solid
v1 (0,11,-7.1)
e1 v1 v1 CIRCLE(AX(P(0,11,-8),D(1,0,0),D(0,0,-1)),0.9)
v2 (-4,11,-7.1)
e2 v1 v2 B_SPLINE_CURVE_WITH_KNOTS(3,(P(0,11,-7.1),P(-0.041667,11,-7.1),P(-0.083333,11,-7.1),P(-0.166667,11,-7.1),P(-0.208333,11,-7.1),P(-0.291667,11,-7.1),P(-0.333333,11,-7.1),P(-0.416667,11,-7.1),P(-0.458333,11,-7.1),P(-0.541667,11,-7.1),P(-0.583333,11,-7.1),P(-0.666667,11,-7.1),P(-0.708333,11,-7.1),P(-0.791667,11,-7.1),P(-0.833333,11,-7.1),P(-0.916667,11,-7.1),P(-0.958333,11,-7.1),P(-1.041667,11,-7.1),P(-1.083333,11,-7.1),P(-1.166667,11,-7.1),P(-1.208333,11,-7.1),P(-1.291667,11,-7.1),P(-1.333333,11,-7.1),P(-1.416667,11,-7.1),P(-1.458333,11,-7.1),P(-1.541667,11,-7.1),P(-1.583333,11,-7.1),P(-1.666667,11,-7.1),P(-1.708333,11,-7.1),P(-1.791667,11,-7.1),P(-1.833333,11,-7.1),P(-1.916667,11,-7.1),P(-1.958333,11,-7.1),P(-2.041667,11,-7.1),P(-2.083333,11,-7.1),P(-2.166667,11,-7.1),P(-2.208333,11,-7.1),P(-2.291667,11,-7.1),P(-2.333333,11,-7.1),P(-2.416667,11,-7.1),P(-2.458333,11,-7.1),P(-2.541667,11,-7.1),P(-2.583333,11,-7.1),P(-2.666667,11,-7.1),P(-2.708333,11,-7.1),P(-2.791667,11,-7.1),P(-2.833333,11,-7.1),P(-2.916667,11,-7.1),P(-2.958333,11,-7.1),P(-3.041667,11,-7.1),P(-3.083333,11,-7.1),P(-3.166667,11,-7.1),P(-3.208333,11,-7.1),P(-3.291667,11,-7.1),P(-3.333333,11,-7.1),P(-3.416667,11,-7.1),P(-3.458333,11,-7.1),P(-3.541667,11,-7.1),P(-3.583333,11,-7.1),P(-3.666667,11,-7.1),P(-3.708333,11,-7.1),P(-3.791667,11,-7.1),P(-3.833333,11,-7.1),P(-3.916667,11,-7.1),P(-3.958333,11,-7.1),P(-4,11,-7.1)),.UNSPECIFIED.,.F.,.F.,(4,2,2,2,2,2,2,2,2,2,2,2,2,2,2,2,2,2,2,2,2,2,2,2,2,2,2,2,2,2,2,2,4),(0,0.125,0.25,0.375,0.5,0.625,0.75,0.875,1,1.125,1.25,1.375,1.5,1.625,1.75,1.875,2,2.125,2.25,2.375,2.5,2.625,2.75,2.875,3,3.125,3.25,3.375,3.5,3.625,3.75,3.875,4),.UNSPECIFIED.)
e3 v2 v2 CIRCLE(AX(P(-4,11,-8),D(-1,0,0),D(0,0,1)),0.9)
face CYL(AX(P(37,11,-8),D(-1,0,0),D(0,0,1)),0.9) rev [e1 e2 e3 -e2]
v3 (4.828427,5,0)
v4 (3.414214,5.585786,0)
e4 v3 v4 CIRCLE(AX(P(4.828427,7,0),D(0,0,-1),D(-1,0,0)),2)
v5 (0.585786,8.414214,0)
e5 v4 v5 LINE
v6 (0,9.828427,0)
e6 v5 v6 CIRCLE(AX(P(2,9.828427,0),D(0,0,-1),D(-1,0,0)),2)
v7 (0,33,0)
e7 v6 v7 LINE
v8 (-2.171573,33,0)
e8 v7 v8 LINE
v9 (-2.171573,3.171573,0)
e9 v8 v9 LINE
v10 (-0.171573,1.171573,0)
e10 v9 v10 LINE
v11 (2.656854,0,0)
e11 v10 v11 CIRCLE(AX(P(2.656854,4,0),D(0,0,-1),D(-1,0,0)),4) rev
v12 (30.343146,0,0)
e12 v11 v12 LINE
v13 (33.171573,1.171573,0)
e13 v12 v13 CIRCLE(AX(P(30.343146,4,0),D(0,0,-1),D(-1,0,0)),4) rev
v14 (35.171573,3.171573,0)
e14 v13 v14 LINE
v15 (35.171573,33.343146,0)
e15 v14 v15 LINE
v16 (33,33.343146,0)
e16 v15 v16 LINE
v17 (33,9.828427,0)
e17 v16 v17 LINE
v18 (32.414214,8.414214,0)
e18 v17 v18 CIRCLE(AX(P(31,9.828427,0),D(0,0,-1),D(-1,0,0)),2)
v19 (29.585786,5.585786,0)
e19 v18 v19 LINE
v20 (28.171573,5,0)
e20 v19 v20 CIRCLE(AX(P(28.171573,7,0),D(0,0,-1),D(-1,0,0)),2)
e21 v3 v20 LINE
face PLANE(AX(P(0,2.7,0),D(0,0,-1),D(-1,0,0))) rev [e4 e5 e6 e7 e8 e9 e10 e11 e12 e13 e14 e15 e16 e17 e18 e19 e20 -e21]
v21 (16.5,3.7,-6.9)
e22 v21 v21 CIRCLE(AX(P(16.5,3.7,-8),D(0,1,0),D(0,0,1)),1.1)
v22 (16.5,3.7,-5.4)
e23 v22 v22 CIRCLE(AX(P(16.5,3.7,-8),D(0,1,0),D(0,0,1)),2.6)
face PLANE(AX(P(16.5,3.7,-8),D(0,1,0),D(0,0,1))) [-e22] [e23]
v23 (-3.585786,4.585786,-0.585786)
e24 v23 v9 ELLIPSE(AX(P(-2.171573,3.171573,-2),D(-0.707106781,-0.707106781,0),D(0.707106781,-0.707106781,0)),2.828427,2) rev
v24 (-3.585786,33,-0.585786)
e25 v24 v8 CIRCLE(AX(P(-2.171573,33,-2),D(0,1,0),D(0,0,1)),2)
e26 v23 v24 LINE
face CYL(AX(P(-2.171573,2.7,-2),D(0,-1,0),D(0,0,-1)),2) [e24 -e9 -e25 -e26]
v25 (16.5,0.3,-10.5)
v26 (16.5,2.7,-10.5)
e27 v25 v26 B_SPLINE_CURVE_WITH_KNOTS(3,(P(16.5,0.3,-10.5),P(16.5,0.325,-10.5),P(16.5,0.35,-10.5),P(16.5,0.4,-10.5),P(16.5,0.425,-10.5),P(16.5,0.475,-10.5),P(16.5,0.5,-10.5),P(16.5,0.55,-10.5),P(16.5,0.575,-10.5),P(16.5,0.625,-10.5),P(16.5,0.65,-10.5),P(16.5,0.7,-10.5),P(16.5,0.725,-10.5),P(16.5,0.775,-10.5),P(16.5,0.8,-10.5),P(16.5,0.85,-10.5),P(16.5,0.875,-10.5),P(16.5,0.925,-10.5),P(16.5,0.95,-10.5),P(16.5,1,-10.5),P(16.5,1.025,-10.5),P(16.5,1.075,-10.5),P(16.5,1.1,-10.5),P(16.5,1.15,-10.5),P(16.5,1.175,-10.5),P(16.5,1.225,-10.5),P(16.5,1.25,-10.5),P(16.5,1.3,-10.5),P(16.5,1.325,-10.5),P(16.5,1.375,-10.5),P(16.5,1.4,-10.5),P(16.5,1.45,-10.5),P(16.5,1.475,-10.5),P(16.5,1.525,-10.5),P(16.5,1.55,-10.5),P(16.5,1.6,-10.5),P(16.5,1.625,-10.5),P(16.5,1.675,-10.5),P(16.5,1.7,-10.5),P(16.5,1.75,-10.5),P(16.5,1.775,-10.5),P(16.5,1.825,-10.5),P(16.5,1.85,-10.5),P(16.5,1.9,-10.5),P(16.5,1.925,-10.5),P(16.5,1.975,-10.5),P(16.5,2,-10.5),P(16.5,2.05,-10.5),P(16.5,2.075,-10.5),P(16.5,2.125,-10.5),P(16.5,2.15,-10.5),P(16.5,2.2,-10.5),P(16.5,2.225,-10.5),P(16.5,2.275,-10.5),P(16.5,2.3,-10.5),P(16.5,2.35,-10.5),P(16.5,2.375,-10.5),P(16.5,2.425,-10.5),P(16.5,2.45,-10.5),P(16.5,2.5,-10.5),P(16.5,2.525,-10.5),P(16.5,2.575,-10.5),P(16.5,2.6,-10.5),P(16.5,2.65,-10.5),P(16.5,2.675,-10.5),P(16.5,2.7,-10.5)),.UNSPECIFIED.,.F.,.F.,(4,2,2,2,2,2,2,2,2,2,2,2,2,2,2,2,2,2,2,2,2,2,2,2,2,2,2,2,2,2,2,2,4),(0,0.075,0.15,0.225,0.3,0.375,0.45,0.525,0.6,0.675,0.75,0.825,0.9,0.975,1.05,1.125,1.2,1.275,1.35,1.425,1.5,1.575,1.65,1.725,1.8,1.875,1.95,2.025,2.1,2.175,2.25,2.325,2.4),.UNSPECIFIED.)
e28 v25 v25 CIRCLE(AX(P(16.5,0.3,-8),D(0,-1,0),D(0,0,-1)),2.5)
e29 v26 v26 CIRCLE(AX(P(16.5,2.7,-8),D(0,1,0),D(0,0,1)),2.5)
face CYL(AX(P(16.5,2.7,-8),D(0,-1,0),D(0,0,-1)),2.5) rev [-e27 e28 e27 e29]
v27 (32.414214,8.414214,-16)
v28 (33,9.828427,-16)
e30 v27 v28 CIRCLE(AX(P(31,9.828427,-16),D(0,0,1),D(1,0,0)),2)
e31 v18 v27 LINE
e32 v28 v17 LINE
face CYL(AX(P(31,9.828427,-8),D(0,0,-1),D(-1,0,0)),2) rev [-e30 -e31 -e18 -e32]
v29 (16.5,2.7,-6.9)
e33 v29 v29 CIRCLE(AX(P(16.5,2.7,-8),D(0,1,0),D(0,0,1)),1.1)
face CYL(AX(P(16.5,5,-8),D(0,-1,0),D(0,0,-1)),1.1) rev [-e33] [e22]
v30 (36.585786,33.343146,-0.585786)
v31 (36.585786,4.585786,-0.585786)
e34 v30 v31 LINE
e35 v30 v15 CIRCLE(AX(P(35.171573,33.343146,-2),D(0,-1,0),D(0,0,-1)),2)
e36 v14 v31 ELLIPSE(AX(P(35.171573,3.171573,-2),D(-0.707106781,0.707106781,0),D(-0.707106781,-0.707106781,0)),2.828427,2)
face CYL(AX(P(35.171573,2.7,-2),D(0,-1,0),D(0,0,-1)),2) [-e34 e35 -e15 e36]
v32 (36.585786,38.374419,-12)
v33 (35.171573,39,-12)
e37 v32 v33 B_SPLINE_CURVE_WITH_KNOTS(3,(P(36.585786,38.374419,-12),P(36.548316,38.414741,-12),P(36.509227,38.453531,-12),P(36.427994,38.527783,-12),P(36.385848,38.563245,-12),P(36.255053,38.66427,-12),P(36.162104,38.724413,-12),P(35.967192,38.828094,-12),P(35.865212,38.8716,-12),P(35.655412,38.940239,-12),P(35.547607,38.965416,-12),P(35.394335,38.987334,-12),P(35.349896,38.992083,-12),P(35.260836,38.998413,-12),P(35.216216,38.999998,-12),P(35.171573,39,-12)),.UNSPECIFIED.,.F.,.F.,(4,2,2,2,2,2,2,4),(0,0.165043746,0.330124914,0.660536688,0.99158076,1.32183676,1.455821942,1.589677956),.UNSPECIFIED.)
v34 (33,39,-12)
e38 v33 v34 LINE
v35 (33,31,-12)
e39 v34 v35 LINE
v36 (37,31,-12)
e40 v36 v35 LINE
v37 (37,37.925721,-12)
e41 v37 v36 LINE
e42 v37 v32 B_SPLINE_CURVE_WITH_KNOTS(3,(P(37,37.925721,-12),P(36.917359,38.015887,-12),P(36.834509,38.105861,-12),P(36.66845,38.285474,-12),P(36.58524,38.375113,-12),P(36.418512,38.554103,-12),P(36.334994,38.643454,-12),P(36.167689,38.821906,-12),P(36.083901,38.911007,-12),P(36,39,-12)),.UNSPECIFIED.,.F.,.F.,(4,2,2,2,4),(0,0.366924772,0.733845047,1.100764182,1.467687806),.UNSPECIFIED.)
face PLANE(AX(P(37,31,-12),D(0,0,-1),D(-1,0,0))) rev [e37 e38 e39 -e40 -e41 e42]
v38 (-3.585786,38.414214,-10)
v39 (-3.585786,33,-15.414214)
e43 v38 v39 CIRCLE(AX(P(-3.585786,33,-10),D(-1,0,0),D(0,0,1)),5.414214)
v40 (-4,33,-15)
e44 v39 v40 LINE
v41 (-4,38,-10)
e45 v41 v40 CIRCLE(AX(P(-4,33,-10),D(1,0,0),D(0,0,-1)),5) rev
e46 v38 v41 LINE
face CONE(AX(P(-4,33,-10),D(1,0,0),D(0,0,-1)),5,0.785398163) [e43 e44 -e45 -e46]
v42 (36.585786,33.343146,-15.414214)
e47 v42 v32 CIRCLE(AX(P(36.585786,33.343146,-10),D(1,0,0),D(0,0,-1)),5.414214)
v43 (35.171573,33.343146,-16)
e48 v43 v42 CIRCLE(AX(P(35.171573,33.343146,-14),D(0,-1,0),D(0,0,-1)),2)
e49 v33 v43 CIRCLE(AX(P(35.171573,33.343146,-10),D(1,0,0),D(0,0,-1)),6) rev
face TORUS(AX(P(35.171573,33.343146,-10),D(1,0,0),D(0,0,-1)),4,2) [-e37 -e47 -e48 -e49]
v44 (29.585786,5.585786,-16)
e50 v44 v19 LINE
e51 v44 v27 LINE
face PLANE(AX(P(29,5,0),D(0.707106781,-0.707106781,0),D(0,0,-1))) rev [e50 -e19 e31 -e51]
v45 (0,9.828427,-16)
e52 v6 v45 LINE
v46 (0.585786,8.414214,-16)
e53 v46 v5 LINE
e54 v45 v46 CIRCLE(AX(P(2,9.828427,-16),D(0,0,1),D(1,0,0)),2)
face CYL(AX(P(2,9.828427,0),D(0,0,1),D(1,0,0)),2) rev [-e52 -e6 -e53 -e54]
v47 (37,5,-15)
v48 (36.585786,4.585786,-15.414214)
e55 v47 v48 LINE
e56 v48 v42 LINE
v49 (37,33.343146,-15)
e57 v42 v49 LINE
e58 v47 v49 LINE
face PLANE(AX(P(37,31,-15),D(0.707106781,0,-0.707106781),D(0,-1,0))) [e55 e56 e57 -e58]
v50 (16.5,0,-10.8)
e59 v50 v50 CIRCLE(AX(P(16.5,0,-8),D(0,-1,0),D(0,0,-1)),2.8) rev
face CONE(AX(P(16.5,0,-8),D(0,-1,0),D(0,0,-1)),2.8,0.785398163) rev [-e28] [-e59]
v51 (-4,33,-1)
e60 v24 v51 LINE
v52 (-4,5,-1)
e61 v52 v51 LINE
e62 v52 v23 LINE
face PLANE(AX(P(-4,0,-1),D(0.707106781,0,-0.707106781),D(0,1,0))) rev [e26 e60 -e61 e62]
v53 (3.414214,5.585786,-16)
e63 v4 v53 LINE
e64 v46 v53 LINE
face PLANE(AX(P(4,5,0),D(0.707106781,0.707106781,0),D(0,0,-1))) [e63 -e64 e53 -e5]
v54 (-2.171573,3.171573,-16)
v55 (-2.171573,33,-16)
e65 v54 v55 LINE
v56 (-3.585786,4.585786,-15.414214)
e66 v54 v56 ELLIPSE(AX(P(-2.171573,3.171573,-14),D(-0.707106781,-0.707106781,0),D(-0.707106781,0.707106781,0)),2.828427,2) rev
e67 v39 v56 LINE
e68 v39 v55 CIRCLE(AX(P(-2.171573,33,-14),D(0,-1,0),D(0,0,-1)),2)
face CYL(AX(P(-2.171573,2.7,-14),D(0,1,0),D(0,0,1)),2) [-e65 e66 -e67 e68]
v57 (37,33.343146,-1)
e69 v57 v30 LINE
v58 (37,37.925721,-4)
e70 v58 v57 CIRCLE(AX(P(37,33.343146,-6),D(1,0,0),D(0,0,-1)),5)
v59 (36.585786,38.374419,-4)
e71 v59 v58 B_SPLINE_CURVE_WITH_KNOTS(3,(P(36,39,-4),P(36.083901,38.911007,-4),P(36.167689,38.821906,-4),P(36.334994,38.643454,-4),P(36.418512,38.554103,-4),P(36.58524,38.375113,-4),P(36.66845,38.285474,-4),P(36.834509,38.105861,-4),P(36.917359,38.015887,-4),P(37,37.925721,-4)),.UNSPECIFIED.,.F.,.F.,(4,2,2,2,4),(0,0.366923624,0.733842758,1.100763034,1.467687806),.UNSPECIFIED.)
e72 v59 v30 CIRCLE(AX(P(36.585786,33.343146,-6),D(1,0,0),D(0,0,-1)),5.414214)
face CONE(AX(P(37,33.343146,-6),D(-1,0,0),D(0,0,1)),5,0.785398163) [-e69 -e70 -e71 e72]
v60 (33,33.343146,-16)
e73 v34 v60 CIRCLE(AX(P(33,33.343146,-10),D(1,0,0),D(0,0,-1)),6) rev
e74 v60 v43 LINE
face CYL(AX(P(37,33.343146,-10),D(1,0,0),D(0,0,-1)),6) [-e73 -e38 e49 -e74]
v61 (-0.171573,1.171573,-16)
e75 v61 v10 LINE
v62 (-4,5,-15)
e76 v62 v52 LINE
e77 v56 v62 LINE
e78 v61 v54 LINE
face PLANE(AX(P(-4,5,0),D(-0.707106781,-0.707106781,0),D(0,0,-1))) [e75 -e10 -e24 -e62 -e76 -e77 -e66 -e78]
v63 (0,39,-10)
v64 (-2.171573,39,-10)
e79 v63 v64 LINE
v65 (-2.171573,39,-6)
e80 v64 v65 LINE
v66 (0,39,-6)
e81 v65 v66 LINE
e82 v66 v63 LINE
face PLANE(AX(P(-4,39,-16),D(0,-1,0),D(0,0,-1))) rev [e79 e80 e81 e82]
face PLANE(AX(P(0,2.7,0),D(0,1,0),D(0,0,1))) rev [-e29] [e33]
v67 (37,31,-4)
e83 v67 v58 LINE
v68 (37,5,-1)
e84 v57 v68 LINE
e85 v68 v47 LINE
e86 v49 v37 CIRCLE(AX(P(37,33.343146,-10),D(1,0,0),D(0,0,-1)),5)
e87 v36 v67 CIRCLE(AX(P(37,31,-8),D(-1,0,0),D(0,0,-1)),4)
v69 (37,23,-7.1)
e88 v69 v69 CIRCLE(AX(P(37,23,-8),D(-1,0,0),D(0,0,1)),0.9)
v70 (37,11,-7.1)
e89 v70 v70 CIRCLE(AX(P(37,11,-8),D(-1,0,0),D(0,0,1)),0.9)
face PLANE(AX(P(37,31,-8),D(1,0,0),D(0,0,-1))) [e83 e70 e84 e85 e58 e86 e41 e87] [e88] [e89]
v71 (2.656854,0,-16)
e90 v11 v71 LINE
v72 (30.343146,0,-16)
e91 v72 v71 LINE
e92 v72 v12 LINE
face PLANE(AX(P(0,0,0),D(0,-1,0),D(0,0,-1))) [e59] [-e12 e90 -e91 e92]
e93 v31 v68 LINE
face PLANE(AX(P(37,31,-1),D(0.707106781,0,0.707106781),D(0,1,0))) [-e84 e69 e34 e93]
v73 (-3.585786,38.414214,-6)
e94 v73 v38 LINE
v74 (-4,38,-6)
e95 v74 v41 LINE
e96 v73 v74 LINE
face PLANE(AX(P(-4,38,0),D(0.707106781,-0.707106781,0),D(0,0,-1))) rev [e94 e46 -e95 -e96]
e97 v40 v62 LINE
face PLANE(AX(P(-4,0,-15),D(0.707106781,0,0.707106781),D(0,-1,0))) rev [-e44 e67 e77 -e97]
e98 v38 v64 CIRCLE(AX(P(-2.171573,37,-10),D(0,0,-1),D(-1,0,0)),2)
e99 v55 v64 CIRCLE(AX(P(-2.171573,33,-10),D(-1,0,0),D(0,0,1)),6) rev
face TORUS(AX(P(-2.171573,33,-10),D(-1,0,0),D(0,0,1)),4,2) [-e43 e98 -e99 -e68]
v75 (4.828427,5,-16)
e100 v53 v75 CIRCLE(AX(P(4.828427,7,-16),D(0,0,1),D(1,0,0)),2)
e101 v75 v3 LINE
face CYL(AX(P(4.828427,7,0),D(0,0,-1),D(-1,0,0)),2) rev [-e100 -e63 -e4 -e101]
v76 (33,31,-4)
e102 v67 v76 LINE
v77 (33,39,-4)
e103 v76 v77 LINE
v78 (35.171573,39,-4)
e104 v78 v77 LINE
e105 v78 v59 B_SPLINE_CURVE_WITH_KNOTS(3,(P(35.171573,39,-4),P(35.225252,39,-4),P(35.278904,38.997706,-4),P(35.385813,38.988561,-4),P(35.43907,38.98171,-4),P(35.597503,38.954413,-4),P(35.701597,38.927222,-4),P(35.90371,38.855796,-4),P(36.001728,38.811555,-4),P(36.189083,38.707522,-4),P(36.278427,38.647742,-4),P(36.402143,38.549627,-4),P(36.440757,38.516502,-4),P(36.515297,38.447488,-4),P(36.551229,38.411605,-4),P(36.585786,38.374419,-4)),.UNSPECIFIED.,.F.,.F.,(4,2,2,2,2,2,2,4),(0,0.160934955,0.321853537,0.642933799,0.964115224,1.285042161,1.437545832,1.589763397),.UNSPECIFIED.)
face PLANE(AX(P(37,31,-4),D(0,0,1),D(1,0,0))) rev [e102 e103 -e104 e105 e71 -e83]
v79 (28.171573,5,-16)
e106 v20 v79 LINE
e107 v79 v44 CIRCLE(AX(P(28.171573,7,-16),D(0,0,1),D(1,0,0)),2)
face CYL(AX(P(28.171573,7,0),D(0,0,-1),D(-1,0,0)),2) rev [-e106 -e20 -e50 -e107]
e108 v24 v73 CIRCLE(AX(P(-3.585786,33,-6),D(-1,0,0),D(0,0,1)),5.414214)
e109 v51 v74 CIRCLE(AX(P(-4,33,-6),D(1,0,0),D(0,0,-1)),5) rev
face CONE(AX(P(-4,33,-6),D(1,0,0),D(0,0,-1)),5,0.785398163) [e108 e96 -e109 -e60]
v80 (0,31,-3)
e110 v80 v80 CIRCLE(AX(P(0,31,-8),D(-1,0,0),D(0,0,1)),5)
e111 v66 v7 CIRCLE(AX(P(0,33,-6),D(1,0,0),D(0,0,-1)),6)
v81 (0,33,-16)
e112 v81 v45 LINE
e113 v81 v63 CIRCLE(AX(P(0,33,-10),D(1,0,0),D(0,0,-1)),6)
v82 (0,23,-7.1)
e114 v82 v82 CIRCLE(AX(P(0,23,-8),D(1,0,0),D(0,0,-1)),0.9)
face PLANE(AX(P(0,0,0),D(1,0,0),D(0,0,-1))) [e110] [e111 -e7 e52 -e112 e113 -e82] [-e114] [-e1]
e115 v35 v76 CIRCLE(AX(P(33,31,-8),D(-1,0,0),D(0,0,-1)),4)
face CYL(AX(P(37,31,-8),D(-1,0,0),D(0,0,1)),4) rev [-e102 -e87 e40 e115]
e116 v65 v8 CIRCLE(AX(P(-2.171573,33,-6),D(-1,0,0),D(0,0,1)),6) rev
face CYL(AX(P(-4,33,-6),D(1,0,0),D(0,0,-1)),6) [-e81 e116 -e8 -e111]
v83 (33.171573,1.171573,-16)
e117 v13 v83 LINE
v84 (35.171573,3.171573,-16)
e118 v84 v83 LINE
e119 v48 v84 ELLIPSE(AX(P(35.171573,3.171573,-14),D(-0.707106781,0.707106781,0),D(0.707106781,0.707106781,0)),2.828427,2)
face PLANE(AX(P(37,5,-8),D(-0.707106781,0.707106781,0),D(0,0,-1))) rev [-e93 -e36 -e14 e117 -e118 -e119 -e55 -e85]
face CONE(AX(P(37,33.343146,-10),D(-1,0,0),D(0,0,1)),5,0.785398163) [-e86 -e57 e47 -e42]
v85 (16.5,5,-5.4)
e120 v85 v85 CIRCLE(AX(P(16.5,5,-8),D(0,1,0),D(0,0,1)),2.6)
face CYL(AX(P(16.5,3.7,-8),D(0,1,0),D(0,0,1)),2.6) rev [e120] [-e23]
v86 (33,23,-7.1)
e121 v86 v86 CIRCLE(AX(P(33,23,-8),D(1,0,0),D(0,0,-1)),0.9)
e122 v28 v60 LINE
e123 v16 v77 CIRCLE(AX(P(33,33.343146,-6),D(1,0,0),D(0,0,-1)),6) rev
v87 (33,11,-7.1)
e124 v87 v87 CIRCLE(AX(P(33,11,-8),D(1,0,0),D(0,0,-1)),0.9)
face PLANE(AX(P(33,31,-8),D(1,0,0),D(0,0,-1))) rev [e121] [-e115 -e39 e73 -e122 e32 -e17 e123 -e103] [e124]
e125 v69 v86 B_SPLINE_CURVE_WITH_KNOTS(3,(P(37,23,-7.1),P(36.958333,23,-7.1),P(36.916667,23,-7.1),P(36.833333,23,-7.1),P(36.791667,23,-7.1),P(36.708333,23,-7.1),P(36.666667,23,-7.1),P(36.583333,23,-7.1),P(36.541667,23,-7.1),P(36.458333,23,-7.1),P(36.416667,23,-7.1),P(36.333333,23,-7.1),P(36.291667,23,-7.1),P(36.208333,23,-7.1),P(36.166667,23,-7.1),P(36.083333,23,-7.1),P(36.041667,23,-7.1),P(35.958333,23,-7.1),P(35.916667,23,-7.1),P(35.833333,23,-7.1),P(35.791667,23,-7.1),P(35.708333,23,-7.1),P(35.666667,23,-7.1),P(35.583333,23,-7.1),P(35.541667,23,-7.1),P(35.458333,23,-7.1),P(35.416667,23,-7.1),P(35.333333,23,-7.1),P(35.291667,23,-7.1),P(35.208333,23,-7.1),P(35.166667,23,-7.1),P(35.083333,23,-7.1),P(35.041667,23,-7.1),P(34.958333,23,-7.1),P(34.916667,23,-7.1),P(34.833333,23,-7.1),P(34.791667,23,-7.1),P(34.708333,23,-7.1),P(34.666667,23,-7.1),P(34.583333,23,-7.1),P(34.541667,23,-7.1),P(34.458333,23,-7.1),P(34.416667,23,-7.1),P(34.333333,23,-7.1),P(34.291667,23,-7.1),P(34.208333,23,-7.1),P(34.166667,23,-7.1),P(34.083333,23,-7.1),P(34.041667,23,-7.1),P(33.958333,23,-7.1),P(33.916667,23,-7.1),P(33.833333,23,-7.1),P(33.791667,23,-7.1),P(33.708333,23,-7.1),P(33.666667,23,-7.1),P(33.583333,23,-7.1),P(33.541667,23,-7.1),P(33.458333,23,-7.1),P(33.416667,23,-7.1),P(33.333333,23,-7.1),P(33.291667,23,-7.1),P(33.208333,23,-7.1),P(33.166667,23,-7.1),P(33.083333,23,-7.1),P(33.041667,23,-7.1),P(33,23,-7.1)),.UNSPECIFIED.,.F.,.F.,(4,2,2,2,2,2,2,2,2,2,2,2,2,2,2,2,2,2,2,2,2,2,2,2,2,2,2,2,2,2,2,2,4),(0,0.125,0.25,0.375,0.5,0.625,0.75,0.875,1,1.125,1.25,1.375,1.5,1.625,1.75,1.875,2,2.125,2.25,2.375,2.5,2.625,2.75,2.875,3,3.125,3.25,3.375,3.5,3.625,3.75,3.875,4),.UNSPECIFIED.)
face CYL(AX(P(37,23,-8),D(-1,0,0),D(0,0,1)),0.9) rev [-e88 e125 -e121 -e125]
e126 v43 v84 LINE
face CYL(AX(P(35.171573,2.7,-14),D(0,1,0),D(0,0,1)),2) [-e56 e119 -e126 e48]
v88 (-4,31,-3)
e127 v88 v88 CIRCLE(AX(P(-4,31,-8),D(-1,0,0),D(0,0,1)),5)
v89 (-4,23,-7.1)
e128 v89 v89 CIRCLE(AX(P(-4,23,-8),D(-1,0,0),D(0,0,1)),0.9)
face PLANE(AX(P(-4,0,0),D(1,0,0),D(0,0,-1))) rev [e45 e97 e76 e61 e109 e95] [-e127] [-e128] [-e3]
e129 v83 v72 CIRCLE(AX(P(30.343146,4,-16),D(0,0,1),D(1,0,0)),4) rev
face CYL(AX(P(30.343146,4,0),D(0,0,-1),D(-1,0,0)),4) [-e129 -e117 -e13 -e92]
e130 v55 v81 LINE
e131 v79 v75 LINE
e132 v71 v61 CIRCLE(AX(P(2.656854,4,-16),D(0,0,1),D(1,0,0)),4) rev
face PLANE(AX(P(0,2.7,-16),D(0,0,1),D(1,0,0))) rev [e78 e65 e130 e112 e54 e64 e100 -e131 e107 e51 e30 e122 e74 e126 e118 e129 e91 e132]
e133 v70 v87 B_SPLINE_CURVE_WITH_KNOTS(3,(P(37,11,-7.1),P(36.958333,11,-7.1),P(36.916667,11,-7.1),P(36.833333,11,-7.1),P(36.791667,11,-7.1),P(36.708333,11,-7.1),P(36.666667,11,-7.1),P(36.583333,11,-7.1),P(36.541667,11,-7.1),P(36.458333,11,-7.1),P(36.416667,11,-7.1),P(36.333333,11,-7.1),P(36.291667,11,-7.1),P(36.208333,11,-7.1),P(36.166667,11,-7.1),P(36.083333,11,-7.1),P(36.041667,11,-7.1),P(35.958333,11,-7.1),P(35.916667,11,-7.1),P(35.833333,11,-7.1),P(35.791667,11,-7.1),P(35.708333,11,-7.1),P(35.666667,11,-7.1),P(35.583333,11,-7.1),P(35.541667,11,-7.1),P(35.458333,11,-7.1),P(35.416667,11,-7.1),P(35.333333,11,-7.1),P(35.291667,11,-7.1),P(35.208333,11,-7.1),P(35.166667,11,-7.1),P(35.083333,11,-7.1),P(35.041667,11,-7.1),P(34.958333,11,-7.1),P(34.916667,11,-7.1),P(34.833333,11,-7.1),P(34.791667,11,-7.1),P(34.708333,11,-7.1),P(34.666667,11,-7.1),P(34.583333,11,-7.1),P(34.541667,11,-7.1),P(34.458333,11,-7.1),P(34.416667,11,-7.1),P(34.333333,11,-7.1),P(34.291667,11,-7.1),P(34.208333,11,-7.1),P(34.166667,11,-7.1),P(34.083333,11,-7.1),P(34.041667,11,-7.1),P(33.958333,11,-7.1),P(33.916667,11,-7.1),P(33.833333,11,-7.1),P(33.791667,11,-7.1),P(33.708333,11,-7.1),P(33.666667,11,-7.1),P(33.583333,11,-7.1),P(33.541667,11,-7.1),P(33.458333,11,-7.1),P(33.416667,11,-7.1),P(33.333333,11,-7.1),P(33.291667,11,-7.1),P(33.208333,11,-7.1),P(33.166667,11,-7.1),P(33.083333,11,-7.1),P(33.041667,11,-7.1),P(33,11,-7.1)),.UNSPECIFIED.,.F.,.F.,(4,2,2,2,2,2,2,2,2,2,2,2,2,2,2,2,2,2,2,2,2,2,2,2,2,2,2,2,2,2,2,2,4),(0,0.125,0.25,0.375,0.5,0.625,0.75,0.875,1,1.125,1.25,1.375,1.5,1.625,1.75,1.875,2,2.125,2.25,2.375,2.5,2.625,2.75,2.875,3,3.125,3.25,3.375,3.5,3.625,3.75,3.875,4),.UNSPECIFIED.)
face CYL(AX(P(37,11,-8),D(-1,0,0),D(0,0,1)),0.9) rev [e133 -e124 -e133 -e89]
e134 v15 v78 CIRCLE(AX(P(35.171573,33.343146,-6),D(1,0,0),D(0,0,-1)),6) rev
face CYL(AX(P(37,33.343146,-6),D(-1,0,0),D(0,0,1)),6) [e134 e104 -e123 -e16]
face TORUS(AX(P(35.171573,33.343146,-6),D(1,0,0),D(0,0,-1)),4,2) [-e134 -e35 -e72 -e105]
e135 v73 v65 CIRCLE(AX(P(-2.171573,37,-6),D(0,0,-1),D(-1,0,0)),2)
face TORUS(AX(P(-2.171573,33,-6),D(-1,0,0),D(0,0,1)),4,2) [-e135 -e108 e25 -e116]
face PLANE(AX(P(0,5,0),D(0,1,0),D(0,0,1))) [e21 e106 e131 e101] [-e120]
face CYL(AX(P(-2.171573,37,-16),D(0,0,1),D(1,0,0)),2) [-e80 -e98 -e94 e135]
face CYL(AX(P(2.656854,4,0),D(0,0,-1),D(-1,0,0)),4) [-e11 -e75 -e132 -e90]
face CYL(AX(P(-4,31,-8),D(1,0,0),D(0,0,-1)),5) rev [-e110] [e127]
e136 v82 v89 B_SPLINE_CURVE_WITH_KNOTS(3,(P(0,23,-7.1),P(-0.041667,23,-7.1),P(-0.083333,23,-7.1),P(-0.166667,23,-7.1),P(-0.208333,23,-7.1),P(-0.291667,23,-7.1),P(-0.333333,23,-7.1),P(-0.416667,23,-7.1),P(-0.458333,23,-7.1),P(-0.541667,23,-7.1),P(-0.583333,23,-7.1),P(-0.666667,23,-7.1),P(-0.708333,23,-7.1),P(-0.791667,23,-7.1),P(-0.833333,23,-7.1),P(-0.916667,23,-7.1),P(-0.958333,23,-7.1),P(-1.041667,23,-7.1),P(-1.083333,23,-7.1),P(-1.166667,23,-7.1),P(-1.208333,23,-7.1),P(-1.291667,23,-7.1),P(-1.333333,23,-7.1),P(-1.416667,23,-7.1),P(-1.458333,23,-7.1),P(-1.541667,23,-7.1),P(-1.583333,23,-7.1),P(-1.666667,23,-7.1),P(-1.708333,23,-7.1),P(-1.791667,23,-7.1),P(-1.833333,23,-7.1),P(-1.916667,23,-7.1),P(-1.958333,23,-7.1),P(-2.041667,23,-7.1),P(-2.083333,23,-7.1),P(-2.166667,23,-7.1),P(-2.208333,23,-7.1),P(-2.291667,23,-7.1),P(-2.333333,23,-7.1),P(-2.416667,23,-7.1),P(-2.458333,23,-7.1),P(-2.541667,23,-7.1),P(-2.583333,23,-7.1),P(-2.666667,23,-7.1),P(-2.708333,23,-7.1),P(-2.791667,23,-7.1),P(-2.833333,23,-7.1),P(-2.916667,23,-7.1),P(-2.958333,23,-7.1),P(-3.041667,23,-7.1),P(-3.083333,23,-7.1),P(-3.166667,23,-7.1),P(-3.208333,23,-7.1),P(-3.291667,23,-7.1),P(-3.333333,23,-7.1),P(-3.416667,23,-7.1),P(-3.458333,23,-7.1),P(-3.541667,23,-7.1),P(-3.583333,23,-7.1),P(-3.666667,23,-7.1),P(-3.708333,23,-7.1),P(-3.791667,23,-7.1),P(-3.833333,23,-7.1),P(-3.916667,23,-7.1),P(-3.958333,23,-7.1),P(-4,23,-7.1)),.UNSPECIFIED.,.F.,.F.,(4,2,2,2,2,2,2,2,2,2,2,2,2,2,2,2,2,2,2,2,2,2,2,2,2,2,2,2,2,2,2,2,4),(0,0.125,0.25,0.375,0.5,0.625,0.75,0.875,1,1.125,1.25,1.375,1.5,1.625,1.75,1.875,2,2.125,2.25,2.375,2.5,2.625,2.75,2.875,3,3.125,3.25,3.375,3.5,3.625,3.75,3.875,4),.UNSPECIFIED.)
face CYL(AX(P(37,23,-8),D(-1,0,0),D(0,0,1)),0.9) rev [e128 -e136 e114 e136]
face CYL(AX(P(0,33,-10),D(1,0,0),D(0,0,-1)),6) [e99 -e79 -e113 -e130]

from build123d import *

# Parameters (mm, degrees)
SKETCH1_W           = 33
SKETCH1_H           = 16
SKETCH1_R           = 2.5
BOSS_EXTRUDE1_DEPTH = 2.7
SKETCH2_W           = 33
SKETCH2_H           = 16
SKETCH2_R           = 1.1
BOSS_EXTRUDE2_DEPTH = 2.3
SKETCH4_W           = 16
SKETCH4_H           = 39
SKETCH4_R           = 5
BOSS_EXTRUDE3_DEPTH = 4
BOSS_EXTRUDE4_DEPTH = 4
FILLET1_R           = 6
CHAMFER1_SIZE       = 4
SKETCH6_R           = 0.9
CUT_EXTRUDE1_DEPTH  = 59.804761712
CHAMFER2_SIZE       = 1
FILLET3_R           = 2
SKETCH7_R           = 2.6
CUT_EXTRUDE2_DEPTH  = 1.3
FILLET4_R           = 2
CHAMFER3_SIZE       = 5
FILLET7_R           = 4
CHAMFER4_SIZE       = 0.3


with BuildPart() as part:
    # Sketch1 → Boss-Extrude1 (new body)
    with BuildSketch(Plane(origin=(0, 0, 0), x_dir=(1, 0, 0), z_dir=(0, 1, 0))):
        with Locations((16.5, 8)):
            Rectangle(SKETCH1_W, SKETCH1_H)
        with Locations(Location((16.5, 8, 0), (0, 0, 90))):
            Circle(SKETCH1_R, mode=Mode.SUBTRACT)
    extrude(amount=BOSS_EXTRUDE1_DEPTH)

    # Sketch2 → Boss-Extrude2 (add)
    with BuildSketch(Plane(origin=(0, 2.7, 0), x_dir=(1, 0, 0), z_dir=(0, 1, 0))):
        with Locations((16.5, 8)):
            Rectangle(SKETCH2_W, SKETCH2_H)
        with Locations(Location((16.5, 8, 0), (0, 0, 270))):
            Circle(SKETCH2_R, mode=Mode.SUBTRACT)
    extrude(amount=BOSS_EXTRUDE2_DEPTH)

    # Sketch4 → Boss-Extrude3 (add)
    with BuildSketch(Plane.ZY):
        with Locations((-8, 19.5)):
            Rectangle(SKETCH4_W, SKETCH4_H)
        with Locations((-8, 31)):
            Circle(SKETCH4_R, mode=Mode.SUBTRACT)
    extrude(amount=BOSS_EXTRUDE3_DEPTH)

    # Sketch5 → Boss-Extrude4 (add)
    with BuildSketch(Plane(origin=(33, 0, 0), x_dir=(0, 0, -1), z_dir=(1, 0, 0))):
        with BuildLine():
            Line((0, 39), (4, 39))
            Line((4, 39), (4, 31))
            ThreePointArc((4, 31), (8, 27), (12, 31))
            Line((12, 31), (12, 39))
            Line((12, 39), (16, 39))
            Line((16, 39), (16, 0))
            Line((16, 0), (0, 0))
            Line((0, 0), (0, 39))
        make_face()
    extrude(amount=BOSS_EXTRUDE4_DEPTH)

    # Fillet1
    # the kernel refuses this fillet: 6 mm, written as the material it takes off along each edge
    with BuildSketch(Plane(origin=(18.857864376, 39, -16), x_dir=(0, -1, 0), z_dir=(1, 0, 0))) as fillet1_piece_1:
        with BuildLine():
            CenterArc((5.656854249, -6), FILLET1_R, 90, 70.528779366)
            Line((0, -4), (-0.113137085, -3.96))
            ThreePointArc((-0.113137085, -3.96), (-0.12, -2), (-0.12, 0))
            Line((-0.12, 0), (0, 0.12))
            Line((0, 0.12), (5.656854249, 0.12))
            Line((5.656854249, 0.12), (5.656854249, 0))
        make_face()
    extrude(amount=32.284271247, mode=Mode.SUBTRACT)
    with BuildSketch(Plane(origin=(15, 39, -16), x_dir=(0, -1, 0), z_dir=(-1, 0, 0))) as fillet1_piece_2:
        with BuildLine():
            CenterArc((FILLET1_R, FILLET1_R), FILLET1_R, 180, 90)
            Line((0, FILLET1_R), (-FILLET1_R * 0.02, FILLET1_R))
            Line((-FILLET1_R * 0.02, FILLET1_R), (-FILLET1_R * 0.02, -FILLET1_R * 0.02))
            Line((-FILLET1_R * 0.02, -FILLET1_R * 0.02), (FILLET1_R, -FILLET1_R * 0.02))
            Line((FILLET1_R, -FILLET1_R * 0.02), (FILLET1_R, 0))
        make_face()
    extrude(amount=34, mode=Mode.SUBTRACT)
    with BuildSketch(Plane(origin=(18.857864376, 39, 0), x_dir=(0, -1, 0), z_dir=(1, 0, 0))) as fillet1_piece_3:
        with BuildLine():
            CenterArc((5.656854249, 6), FILLET1_R, 199.471220634, 70.528779366)
            Line((0, 4), (-0.113137085, 3.96))
            ThreePointArc((-0.113137085, 3.96), (-0.12, 2), (-0.12, 0))
            Line((-0.12, 0), (0, -0.12))
            Line((0, -0.12), (5.656854249, -0.12))
            Line((5.656854249, -0.12), (5.656854249, 0))
        make_face()
    extrude(amount=32.284271247, mode=Mode.SUBTRACT)
    with BuildSketch(Plane(origin=(15, 39, 0), x_dir=(0, -1, 0), z_dir=(-1, 0, 0))) as fillet1_piece_4:
        with BuildLine():
            CenterArc((FILLET1_R, -FILLET1_R), FILLET1_R, 90, 90)
            Line((0, -FILLET1_R), (-FILLET1_R * 0.02, -FILLET1_R))
            Line((-FILLET1_R * 0.02, -FILLET1_R), (-FILLET1_R * 0.02, FILLET1_R * 0.02))
            Line((-FILLET1_R * 0.02, FILLET1_R * 0.02), (FILLET1_R, FILLET1_R * 0.02))
            Line((FILLET1_R, FILLET1_R * 0.02), (FILLET1_R, 0))
        make_face()
    extrude(amount=34, mode=Mode.SUBTRACT)

    # Chamfer1
    chamfer1_edges = [part.edges().sort_by_distance(p)[0] for p in [
        (0, 5, -8),
        (33, 5, -8),
    ]]
    chamfer(chamfer1_edges, length=CHAMFER1_SIZE)

    # Sketch6 → Cut-Extrude1 (cut, through all)
    with BuildSketch(Plane.ZY.offset(4)):
        with Locations((-8, 23)):
            Circle(SKETCH6_R)
        with Locations((-8, 11)):
            Circle(SKETCH6_R)
    extrude(amount=-CUT_EXTRUDE1_DEPTH, mode=Mode.SUBTRACT)

    # Chamfer2
    chamfer2_edges = [part.edges().sort_by_distance(p)[0] for p in [
        (-4, 16.5, 0),
        (37, 16.671572875, -16),
        (-4, 16.5, -16),
        (37, 16.671572875, 0),
        (37, 36.807247366, -1.101020514),
        (37, 36.807247366, -14.898979486),
        (-4, 39, -8),
        (-4, 37.242640687, -1.757359313),
        (-4, 37.242640687, -14.242640687),
    ]]
    chamfer(chamfer2_edges, length=CHAMFER2_SIZE)

    # Fillet3
    fillet3_edges = [part.edges().sort_by_distance(p)[0] for p in [
        (36, 16.671572875, -16),
        (36, 16.671572875, 0),
        (-3, 16.5, -16),
        (-3, 37.242640687, -14.242640687),
        (-3, 16.5, 0),
        (-3, 37.242640687, -1.757359313),
        (36, 36.807247366, -14.898979486),
        (36, 36.807247366, -1.101020514),
        (-3, 39, -8),
    ]]
    fillet(fillet3_edges, radius=FILLET3_R)

    # Sketch7 → Cut-Extrude2 (cut)
    with BuildSketch(Plane(origin=(0, 5, 0), x_dir=(1, 0, 0), z_dir=(0, 1, 0))):
        with Locations(Location((16.5, 8, 0), (0, 0, 270))):
            Circle(SKETCH7_R)
    extrude(amount=-CUT_EXTRUDE2_DEPTH, mode=Mode.SUBTRACT)

    # Fillet4
    fillet4_edges = [part.edges().sort_by_distance(p)[0] for p in [
        (29, 5, -8),
        (33, 9, -8),
        (0, 9, -8),
        (4, 5, -8),
    ]]
    fillet(fillet4_edges, radius=FILLET4_R)

    # Chamfer3
    chamfer3_edges = [part.edges().sort_by_distance(p)[0] for p in [
        (37, 0, -8),
        (-4, 0, -8),
    ]]
    chamfer(chamfer3_edges, length=CHAMFER3_SIZE)

    # Fillet7
    fillet7_edges = [part.edges().sort_by_distance(p)[0] for p in [
        (1, 0, -8),
        (32, 0, -8),
    ]]
    fillet(fillet7_edges, radius=FILLET7_R)

    # Chamfer4
    chamfer4_edges = [part.edges().sort_by_distance(p)[0] for p in [
        (16.5, 0, -5.5),
    ]]
    chamfer(chamfer4_edges, length=CHAMFER4_SIZE)


solid = part.part
